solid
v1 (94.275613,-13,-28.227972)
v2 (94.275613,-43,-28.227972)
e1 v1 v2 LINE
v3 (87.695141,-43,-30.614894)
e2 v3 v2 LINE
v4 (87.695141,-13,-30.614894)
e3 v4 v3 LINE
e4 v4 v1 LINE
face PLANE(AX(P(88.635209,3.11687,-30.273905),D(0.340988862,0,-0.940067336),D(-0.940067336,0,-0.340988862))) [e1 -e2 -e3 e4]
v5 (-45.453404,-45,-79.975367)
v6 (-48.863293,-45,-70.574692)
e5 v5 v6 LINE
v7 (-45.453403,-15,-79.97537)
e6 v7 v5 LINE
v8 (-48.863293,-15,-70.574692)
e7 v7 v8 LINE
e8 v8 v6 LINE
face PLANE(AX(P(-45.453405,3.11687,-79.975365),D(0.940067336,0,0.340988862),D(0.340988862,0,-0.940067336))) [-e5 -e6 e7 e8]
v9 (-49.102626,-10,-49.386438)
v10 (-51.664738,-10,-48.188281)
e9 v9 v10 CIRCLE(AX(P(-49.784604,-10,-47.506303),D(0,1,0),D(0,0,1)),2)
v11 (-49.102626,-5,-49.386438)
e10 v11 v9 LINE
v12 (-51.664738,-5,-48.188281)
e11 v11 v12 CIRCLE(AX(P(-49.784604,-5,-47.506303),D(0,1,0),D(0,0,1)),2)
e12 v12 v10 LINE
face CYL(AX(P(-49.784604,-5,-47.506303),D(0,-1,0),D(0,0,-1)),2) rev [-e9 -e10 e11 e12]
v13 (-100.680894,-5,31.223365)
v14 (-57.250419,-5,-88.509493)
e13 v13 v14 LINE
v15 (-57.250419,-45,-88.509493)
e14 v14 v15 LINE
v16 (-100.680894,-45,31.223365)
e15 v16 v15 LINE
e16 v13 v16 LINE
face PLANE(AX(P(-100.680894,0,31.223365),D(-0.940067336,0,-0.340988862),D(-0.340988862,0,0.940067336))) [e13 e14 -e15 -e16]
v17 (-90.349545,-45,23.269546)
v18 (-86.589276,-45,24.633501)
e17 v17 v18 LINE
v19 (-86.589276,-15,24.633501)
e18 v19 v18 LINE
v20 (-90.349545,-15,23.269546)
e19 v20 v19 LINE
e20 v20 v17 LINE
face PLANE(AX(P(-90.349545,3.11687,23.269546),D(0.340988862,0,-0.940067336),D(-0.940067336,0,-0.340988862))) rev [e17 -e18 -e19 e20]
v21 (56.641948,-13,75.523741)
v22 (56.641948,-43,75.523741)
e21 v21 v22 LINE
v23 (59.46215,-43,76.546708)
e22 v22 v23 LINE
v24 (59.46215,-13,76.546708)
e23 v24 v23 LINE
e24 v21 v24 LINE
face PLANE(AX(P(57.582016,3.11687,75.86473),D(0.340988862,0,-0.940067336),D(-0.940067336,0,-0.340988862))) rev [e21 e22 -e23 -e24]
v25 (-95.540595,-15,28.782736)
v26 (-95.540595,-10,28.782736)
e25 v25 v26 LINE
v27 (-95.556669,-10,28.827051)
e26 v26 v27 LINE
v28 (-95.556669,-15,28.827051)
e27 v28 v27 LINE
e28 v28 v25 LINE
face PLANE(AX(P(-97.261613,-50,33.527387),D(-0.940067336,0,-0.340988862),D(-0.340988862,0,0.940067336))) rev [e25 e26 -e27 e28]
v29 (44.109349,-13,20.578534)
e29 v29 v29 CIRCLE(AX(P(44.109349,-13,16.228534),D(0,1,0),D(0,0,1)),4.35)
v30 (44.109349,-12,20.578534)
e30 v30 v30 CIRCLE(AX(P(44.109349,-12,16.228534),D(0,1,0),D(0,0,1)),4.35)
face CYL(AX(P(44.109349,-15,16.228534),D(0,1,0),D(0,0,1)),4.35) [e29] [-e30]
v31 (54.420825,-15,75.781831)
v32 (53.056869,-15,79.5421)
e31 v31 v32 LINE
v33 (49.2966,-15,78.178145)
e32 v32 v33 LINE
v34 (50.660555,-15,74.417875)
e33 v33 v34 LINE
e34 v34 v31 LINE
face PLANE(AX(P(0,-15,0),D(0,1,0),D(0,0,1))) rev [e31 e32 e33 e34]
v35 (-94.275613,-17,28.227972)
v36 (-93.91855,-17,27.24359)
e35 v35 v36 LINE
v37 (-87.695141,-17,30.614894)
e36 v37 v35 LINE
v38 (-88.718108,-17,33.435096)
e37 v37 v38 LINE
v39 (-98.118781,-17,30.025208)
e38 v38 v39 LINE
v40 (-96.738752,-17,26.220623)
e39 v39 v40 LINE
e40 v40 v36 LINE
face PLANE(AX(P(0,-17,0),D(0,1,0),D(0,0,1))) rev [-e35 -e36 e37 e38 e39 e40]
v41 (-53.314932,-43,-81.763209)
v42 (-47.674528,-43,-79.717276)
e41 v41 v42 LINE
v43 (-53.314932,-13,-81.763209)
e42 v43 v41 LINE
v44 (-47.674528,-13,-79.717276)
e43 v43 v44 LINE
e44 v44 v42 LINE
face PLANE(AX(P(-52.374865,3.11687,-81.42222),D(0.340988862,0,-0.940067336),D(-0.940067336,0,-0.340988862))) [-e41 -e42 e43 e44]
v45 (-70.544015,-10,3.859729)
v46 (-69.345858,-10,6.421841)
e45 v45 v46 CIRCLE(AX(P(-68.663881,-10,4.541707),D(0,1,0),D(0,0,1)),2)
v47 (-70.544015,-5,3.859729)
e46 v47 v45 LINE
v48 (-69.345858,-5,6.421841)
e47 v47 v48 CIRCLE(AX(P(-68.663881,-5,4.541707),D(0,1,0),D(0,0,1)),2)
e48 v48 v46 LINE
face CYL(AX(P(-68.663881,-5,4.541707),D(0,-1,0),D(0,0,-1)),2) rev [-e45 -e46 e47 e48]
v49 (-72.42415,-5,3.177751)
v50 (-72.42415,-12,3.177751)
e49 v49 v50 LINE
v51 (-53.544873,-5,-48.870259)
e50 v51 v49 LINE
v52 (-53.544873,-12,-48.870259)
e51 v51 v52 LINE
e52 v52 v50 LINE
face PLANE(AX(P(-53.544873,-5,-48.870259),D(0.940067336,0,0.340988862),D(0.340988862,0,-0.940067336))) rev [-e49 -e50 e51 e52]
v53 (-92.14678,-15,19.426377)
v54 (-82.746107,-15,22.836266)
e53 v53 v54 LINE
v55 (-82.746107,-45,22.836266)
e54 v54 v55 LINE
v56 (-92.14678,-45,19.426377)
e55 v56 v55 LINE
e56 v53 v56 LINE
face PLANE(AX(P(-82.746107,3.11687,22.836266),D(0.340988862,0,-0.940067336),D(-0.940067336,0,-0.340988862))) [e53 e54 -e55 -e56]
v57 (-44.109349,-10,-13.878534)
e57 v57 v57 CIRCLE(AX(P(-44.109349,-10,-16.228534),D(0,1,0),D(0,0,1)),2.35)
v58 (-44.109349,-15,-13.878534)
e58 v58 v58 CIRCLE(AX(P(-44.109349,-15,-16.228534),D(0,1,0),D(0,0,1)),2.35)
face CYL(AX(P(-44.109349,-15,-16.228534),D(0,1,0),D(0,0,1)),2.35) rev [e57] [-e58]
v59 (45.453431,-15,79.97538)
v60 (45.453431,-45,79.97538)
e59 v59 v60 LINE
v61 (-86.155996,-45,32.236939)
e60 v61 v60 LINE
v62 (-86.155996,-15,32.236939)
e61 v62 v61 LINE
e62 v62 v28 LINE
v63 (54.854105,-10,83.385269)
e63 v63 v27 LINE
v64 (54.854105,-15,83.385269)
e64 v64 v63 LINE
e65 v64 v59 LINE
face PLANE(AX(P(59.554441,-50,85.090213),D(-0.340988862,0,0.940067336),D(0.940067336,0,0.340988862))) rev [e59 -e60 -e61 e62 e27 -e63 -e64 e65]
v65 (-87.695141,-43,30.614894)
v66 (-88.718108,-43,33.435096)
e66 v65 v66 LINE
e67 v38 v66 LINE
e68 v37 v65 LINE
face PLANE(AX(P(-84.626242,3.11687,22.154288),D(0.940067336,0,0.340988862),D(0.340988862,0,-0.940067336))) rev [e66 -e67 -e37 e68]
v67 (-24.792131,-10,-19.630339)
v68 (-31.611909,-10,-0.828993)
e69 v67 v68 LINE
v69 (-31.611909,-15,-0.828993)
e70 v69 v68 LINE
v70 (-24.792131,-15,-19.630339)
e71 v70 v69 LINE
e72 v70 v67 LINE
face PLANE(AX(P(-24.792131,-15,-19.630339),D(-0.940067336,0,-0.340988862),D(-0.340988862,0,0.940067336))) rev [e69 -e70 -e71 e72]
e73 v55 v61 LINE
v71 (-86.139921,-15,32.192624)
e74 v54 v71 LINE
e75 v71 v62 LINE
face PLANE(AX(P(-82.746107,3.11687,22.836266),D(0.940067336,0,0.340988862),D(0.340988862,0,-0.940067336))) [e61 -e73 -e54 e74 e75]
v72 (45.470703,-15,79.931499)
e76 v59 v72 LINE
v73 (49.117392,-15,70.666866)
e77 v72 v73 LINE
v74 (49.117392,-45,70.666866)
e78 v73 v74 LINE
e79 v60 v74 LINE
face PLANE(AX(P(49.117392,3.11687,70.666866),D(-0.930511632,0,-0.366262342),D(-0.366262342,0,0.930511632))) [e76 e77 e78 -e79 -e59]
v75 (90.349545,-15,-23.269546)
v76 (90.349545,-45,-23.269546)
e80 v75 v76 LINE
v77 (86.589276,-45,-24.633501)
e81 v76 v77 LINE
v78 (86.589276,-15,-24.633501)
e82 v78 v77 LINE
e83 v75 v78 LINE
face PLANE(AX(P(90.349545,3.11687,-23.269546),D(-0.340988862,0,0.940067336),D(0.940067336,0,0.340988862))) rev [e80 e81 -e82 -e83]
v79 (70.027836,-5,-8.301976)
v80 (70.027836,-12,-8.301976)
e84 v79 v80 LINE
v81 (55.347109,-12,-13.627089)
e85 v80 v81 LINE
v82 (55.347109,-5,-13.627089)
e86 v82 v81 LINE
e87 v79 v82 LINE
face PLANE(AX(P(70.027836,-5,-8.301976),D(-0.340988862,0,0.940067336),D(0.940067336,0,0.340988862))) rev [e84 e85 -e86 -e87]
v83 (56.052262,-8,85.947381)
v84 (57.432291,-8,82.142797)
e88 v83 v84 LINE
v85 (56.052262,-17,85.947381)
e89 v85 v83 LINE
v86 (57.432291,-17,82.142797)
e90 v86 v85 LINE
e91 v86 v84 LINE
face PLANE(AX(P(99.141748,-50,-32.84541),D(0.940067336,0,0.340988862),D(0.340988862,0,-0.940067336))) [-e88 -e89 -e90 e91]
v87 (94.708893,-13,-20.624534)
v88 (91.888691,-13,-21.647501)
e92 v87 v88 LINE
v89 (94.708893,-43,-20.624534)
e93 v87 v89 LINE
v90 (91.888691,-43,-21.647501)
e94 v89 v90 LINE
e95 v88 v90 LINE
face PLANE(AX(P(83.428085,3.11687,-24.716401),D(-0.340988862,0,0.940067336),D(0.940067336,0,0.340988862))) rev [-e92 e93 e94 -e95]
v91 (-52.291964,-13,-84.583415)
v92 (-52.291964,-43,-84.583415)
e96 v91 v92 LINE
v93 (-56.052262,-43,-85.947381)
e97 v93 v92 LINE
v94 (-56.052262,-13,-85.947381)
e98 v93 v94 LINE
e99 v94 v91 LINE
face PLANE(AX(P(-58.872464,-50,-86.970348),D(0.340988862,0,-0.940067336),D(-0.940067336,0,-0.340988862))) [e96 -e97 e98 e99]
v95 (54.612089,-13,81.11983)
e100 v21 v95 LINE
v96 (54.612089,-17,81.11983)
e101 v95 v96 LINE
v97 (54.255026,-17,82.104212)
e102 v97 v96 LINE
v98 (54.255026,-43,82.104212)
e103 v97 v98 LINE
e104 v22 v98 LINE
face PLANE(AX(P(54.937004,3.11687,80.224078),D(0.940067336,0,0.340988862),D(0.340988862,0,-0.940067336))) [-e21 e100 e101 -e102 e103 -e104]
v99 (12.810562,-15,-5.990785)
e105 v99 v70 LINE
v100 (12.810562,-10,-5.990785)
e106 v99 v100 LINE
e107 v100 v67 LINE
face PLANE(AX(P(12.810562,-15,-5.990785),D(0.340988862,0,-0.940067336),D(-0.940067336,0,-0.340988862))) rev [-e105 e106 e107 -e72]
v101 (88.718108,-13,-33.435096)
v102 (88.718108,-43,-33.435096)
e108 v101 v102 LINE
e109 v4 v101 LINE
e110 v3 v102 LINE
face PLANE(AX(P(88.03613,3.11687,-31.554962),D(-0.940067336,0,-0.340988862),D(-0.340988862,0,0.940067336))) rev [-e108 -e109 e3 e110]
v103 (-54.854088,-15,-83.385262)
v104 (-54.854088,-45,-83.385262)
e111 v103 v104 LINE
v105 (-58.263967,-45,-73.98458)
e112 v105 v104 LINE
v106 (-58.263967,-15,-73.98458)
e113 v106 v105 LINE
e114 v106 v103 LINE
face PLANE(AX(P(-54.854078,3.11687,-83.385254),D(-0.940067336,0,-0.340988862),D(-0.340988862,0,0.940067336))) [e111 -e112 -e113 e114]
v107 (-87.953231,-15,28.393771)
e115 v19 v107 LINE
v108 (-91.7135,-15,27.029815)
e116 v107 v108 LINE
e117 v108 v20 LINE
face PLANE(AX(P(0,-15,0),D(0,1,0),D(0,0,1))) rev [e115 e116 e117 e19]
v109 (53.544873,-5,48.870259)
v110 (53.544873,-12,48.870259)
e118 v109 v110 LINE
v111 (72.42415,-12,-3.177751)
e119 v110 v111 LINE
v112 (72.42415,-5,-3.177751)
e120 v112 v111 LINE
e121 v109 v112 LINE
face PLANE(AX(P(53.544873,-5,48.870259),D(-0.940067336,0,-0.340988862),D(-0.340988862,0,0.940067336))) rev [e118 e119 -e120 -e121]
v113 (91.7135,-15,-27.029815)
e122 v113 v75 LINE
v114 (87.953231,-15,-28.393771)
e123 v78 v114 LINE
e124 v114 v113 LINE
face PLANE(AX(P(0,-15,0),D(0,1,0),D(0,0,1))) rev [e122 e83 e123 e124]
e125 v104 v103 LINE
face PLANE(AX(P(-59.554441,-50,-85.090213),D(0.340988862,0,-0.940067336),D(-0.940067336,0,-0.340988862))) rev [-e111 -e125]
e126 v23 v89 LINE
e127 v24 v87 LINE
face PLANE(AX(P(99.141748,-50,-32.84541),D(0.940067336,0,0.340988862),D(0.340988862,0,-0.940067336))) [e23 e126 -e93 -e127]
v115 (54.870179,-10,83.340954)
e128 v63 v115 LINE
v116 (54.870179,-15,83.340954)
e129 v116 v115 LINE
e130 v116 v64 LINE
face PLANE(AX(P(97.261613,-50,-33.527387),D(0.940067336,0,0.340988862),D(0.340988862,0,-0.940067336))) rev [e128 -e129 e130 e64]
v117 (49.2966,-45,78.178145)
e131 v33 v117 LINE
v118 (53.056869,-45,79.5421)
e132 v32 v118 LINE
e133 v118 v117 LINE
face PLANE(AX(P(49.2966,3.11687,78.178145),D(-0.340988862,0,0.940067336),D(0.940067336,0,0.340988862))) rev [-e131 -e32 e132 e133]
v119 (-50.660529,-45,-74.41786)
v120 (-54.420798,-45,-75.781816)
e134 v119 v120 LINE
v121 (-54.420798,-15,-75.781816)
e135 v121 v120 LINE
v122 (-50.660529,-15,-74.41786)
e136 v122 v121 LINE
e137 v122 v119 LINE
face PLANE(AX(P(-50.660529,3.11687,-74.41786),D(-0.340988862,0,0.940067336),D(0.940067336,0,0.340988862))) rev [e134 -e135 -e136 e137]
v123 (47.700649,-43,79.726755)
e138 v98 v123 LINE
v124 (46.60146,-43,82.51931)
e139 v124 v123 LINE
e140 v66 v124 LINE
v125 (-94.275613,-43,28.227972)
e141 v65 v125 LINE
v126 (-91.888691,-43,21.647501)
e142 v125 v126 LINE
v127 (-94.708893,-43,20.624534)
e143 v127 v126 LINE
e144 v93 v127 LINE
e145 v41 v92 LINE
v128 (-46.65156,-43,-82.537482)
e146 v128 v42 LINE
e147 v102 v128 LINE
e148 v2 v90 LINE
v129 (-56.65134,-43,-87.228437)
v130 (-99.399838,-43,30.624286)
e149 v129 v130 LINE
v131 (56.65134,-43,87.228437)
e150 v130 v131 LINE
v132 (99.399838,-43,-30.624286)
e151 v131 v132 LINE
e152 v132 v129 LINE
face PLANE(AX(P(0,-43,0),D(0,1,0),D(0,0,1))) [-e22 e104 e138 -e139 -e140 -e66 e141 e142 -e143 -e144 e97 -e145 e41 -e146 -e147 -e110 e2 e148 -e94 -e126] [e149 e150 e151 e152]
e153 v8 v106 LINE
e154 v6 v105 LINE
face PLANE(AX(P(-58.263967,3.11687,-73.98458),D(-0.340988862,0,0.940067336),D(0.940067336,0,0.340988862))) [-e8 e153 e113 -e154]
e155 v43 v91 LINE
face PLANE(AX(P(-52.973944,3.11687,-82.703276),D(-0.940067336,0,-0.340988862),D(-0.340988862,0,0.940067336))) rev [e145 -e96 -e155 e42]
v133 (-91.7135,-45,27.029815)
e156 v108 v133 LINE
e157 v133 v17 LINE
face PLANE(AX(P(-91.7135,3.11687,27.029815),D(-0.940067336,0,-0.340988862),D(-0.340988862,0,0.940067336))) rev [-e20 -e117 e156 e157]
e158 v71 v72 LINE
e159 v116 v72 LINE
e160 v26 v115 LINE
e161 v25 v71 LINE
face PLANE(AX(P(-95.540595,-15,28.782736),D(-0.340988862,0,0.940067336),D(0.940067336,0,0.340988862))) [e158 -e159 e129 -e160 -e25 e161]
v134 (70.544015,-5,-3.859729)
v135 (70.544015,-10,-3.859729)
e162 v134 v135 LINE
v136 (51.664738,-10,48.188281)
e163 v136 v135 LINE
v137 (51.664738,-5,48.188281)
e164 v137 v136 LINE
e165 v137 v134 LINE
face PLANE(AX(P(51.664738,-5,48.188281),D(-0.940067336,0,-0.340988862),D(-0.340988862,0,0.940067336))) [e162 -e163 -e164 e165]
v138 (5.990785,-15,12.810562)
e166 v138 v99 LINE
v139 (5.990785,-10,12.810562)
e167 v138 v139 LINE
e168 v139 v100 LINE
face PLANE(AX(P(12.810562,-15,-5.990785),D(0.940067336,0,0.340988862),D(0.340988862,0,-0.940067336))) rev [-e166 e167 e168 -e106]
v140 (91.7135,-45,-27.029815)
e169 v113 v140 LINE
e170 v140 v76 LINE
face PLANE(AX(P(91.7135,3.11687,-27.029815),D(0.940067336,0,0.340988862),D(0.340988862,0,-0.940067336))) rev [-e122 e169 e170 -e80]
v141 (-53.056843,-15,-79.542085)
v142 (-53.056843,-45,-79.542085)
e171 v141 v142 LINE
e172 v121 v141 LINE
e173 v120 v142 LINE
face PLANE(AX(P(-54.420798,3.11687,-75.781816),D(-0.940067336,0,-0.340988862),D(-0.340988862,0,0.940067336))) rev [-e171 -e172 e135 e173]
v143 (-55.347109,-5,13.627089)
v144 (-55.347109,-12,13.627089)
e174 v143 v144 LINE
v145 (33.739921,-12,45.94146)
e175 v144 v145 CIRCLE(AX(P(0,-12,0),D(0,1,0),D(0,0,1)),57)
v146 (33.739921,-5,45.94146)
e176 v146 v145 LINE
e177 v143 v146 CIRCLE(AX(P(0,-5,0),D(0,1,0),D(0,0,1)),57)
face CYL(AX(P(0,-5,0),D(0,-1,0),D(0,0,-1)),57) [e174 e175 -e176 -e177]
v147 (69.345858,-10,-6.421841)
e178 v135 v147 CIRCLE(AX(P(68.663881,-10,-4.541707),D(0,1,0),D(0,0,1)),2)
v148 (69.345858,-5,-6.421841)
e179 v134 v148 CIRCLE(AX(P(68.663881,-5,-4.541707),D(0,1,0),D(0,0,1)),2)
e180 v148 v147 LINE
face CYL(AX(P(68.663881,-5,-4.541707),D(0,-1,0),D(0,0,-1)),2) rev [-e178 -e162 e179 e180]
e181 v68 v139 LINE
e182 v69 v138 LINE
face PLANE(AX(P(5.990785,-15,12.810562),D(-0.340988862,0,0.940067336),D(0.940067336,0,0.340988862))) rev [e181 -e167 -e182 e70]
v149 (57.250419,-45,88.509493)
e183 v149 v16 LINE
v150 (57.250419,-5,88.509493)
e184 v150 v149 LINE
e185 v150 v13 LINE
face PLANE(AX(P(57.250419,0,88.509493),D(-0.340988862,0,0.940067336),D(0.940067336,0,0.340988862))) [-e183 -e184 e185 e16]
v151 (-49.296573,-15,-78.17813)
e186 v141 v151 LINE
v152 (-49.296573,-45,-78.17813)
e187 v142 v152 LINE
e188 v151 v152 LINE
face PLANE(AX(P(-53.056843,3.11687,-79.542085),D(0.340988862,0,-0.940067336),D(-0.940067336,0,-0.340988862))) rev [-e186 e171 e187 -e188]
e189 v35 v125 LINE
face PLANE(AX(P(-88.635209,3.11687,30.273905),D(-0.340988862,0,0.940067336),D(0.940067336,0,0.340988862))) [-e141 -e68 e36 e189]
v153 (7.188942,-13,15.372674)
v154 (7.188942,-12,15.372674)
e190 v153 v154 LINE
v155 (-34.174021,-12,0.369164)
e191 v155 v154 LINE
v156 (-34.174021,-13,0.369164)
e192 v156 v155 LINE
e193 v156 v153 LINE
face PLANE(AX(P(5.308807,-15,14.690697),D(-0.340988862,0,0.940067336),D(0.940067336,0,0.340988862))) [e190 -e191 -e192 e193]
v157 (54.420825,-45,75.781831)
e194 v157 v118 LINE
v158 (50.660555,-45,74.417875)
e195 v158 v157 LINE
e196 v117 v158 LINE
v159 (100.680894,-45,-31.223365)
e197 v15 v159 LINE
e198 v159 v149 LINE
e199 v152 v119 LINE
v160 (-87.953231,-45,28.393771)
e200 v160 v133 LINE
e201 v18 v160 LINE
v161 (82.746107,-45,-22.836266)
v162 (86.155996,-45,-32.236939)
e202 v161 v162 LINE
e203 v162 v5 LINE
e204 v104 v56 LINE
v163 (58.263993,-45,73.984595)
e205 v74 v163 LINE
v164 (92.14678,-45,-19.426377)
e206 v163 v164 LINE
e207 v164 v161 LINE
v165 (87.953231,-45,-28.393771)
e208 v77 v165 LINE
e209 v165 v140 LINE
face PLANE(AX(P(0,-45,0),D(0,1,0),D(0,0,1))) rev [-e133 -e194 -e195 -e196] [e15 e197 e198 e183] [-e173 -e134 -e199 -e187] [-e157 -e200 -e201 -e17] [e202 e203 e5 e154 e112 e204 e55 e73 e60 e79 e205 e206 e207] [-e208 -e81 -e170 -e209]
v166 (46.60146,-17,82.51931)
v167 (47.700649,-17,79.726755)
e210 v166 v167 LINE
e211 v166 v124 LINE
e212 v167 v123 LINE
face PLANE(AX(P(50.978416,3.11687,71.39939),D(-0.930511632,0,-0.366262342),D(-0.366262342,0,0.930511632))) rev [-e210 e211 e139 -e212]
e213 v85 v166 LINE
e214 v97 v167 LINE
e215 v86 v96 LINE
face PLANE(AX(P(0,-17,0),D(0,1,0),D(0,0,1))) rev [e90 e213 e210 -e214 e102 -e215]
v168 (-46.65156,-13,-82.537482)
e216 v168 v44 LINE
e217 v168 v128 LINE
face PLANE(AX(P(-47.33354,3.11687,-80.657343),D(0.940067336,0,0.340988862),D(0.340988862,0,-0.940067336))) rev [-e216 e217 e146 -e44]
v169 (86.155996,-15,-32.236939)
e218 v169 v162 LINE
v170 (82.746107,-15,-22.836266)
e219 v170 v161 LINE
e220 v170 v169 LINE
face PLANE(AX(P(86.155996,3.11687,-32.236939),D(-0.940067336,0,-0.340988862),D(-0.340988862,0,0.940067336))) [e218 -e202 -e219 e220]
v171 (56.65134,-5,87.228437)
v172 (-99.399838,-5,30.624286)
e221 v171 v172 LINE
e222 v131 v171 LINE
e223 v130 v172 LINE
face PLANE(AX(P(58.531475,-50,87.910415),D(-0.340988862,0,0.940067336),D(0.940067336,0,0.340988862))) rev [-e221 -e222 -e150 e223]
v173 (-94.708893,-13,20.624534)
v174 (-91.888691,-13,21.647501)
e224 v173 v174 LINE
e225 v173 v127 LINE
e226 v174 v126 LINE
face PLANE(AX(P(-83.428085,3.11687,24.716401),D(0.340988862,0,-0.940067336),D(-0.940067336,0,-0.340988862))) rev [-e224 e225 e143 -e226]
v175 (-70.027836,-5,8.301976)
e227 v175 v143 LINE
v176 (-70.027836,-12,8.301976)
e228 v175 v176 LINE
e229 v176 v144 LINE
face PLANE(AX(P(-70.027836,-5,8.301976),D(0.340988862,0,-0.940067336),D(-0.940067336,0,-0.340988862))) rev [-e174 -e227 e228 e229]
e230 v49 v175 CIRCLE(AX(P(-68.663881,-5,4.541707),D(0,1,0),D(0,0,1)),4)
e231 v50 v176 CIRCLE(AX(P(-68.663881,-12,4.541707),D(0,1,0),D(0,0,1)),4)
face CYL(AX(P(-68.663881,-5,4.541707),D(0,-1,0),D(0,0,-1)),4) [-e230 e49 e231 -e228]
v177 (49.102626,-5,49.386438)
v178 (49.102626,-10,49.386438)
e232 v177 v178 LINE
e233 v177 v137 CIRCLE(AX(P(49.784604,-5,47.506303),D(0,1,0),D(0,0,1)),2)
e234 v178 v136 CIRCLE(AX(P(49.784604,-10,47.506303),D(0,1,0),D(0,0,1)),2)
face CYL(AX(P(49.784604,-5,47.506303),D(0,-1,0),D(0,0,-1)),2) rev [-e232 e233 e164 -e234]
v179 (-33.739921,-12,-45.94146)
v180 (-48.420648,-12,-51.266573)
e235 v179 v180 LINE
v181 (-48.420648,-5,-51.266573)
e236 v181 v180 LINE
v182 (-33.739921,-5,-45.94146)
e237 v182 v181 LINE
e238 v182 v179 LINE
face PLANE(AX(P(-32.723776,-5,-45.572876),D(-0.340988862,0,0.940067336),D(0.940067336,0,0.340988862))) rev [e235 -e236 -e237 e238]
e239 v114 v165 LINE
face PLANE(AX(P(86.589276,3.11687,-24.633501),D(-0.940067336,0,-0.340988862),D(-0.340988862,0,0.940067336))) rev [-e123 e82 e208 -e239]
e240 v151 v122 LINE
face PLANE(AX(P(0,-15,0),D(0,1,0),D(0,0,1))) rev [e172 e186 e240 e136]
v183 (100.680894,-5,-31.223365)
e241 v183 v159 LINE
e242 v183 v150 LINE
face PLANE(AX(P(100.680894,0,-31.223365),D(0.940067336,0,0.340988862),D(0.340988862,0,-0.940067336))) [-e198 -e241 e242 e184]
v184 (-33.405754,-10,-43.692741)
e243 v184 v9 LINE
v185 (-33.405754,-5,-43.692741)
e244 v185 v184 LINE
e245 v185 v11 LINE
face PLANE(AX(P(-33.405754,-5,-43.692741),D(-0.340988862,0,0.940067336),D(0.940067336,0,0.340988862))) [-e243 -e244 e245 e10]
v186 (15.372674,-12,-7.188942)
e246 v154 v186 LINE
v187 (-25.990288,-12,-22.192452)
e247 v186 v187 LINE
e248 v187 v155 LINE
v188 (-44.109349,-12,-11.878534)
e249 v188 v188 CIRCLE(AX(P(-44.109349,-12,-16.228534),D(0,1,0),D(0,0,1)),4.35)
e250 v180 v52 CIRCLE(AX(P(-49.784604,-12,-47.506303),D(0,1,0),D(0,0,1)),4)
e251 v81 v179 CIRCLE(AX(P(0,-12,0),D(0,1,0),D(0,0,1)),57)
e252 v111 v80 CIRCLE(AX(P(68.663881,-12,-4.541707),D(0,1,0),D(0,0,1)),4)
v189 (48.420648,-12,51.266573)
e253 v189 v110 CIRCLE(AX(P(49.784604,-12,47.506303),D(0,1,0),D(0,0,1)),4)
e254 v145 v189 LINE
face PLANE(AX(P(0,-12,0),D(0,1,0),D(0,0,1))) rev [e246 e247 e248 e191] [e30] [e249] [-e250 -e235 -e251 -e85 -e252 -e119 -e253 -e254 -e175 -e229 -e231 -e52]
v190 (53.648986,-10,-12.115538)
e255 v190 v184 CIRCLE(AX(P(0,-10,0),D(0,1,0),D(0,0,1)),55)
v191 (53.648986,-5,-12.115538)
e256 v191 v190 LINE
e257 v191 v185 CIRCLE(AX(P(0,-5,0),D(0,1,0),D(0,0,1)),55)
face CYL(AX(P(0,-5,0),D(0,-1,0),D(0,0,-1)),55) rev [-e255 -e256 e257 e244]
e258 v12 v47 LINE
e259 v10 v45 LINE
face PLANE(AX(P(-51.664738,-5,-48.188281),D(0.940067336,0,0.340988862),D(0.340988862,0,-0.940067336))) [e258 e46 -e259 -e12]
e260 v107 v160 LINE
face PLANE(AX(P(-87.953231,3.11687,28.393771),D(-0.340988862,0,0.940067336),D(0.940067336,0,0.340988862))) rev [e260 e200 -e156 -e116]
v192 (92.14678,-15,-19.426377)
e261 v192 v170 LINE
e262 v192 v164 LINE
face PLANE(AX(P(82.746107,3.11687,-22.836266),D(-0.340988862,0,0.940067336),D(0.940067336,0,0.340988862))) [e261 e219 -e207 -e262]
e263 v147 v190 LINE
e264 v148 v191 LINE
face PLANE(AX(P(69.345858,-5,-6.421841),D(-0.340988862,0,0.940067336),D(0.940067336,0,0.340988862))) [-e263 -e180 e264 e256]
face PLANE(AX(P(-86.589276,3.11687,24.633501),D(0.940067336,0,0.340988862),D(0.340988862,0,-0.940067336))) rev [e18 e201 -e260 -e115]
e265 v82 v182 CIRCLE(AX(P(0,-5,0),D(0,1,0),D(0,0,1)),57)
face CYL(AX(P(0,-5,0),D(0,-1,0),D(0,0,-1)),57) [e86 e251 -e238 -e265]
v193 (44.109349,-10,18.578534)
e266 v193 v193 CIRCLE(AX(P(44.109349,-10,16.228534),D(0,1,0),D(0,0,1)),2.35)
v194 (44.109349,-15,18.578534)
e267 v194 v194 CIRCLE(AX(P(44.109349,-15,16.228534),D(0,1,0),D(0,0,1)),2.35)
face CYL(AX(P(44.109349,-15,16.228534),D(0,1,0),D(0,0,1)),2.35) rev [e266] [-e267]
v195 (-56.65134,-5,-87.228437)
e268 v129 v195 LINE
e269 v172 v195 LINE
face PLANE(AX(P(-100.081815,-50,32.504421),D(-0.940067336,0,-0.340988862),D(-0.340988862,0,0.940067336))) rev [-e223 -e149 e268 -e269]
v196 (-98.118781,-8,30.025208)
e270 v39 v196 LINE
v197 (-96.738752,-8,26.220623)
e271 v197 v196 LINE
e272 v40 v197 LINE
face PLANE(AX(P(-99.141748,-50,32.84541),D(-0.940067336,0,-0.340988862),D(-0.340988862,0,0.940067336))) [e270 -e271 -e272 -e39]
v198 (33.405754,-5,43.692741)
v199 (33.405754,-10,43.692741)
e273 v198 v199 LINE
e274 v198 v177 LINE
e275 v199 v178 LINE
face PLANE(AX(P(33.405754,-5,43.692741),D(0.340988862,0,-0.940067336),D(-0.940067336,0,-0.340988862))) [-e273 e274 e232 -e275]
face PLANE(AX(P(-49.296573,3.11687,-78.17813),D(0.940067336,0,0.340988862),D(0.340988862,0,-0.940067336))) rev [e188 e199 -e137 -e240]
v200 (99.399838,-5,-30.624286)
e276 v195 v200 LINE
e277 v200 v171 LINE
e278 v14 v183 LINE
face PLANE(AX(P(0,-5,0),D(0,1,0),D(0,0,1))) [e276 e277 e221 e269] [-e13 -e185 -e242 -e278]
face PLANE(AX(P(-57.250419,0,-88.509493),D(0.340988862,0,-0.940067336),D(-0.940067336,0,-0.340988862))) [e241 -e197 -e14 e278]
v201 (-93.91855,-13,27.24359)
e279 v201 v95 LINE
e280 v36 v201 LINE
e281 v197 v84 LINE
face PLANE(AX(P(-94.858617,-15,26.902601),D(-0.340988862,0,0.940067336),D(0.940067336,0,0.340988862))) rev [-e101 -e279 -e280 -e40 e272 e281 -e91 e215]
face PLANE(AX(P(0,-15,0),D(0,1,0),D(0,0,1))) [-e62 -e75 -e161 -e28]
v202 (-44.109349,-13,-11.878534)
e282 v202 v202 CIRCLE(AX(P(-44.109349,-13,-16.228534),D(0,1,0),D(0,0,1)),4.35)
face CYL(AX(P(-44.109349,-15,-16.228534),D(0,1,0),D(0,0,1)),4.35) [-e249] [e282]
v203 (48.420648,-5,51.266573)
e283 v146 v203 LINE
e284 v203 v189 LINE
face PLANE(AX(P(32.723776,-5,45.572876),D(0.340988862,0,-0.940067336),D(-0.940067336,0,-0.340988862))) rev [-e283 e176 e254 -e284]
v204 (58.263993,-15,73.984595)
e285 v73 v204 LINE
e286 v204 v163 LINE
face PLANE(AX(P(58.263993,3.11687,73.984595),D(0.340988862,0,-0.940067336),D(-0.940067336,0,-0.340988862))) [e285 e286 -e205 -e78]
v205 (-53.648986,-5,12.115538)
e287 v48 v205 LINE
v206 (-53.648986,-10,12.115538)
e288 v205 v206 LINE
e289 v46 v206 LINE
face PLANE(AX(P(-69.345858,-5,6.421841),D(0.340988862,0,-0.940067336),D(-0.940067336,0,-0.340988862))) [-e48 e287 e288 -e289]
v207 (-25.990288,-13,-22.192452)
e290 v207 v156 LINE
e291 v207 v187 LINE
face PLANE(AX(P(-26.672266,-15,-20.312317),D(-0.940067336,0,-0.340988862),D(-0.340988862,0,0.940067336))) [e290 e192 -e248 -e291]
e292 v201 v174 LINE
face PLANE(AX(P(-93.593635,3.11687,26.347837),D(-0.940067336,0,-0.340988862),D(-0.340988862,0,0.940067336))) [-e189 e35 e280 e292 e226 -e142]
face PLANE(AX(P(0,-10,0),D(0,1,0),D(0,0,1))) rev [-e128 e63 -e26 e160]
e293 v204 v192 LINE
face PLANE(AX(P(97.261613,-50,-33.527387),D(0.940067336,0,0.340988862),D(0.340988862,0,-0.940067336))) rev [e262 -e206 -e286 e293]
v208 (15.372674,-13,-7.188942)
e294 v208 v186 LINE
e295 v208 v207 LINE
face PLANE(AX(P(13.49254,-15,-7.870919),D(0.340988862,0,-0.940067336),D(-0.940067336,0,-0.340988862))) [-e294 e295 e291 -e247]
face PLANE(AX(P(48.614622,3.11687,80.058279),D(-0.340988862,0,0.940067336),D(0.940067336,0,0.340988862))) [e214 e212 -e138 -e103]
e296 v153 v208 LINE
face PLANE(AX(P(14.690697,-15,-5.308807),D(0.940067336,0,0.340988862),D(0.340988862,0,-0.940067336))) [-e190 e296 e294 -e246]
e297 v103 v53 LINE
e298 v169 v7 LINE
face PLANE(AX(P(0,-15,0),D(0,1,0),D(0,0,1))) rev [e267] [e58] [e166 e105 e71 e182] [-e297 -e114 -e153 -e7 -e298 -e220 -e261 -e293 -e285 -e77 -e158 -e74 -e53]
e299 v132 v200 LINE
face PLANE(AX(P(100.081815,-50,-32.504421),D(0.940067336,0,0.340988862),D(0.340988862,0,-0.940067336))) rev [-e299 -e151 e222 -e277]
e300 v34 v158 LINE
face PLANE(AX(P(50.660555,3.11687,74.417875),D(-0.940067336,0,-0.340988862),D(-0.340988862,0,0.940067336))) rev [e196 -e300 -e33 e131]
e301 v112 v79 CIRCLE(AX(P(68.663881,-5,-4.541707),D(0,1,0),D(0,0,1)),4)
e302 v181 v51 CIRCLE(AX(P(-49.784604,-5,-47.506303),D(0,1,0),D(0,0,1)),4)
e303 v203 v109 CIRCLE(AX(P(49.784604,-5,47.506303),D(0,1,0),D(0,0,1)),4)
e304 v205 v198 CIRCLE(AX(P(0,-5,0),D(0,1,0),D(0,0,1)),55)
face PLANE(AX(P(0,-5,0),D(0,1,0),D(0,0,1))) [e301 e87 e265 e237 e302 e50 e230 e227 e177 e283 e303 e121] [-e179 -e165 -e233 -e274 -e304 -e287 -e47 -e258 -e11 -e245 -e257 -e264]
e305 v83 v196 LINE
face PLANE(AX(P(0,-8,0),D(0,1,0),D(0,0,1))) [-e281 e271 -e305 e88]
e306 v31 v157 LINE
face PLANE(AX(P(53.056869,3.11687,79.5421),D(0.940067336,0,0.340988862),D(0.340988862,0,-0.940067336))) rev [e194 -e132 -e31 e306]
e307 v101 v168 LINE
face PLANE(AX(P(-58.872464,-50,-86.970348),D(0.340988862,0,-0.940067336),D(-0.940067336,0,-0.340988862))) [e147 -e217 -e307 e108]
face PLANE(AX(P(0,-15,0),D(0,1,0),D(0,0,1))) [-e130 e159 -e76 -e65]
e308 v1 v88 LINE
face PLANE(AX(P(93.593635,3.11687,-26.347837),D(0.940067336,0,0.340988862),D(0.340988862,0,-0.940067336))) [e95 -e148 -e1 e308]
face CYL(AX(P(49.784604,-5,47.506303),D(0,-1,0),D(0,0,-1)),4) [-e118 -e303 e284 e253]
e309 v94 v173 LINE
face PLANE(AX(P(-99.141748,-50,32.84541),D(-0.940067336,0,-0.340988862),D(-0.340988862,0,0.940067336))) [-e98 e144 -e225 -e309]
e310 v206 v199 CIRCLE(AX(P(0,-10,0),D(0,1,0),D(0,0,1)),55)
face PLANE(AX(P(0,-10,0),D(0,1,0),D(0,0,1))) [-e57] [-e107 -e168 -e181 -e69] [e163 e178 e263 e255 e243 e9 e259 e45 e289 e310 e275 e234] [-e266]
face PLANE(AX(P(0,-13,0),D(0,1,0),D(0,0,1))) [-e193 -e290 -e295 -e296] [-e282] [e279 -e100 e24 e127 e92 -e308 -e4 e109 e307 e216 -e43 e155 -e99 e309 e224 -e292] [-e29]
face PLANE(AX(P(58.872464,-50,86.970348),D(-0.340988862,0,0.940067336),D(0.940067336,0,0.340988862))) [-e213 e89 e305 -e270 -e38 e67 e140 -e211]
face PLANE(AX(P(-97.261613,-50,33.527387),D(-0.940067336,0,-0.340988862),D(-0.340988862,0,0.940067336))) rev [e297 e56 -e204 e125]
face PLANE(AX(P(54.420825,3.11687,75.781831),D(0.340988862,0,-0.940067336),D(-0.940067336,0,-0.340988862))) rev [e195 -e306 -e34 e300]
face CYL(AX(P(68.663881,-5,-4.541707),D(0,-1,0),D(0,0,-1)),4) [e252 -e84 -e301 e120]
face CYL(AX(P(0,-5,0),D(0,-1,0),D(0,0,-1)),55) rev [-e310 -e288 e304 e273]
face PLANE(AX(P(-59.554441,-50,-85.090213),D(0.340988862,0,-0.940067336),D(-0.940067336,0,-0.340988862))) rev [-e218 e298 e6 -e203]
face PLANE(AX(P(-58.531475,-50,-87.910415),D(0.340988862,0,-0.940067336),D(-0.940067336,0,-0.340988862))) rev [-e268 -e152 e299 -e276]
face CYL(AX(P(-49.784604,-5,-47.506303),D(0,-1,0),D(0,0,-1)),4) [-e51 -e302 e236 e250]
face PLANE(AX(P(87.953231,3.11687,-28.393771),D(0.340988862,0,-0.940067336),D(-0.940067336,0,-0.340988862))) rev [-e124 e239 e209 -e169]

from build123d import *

# Parameters (mm, degrees)
EXTRUDE_1_DEPTH      = 50
SHELL_1_T            = -5
EXTRUDE_2_DEPTH      = 5
SKETCH_10_R          = 2.35
EXTRUDE_3_DEPTH      = 5
CUT_EXTRUDE_1_DEPTH  = 5
EXTRUDE_START        = -30
EXTRUDE_4_DEPTH      = 30
SHELL_START          = -13
SHELL_13_DEPTH       = 8
SHELL_START_2        = -43
SHELL_13_2_DEPTH     = 30
SHELL_13_3_OUTLINE_R = 4.35
SHELL_13_3_DEPTH     = 1
SHELL_START_3        = -8
SHELL_13_4_DEPTH     = 3
SHELL_START_4        = -5
SHELL_13_5_DEPTH     = 3
SHELL_13_6_DEPTH     = 26
CUT_EXTRUDE_2_DEPTH  = 144.120865122
CUT_EXTRUDE_3_DEPTH  = 5


# Read off the part's stored shape, not the designer's step: 凸台-拉伸4, 抽壳13
with BuildPart() as part:
    # 草图3 → 凸台-拉伸1 (new body)
    with BuildSketch(Plane(origin=(0, 0, 0), x_dir=(1, 0, 0), z_dir=(0, 1, 0))):
        Polygon((57.849497127, -89.790549593), (-101.961949946, -31.82244298), (-57.849497127, 89.790549593), (101.961949946, 31.82244298), align=None)
    extrude(amount=-EXTRUDE_1_DEPTH)

    # 抽壳1
    shell_1_openings = [part.faces().sort_by_distance(p)[0] for p in [
        (0, 0, 0),
    ]]
    offset(amount=SHELL_1_T, openings=shell_1_openings, kind=Kind.INTERSECTION)

    # 草图4 → 凸台-拉伸2 (add)
    with BuildSketch(Plane(origin=(0, -10, 0), x_dir=(1, 0, 0), z_dir=(0, 1, 0))):
        Polygon((-54.85410476, 83.385268602), (95.556668956, 28.827050613), (54.793783145, -83.551568403), (-95.616990571, -28.993350414), align=None)
        with BuildLine():
            Line((-33.405753886, 43.6927409), (-49.102625926, 49.386437869))
            ThreePointArc((-49.102625926, 49.386437869), (-50.631828553, 49.317990247), (-51.664738322, 48.188280923))
            Line((-51.664738322, 48.188280923), (-70.544015322, -3.859728807))
            ThreePointArc((-70.544015322, -3.859728807), (-70.4755677, -5.388931433), (-69.345858375, -6.421841203))
            Line((-69.345858375, -6.421841203), (-53.648986335, -12.115538173))
            ThreePointArc((-53.648986335, -12.115538173), (-18.754387434, -51.703703465), (33.405753886, -43.6927409))
            Line((33.405753886, -43.6927409), (49.102625926, -49.386437869))
            ThreePointArc((49.102625926, -49.386437869), (50.631828553, -49.317990247), (51.664738322, -48.188280923))
            Line((51.664738322, -48.188280923), (70.544015322, 3.859728807))
            ThreePointArc((70.544015322, 3.859728807), (70.4755677, 5.388931433), (69.345858375, 6.421841203))
            Line((69.345858375, 6.421841203), (53.648986335, 12.115538173))
            ThreePointArc((53.648986335, 12.115538173), (18.754387434, 51.703703465), (-33.405753886, 43.6927409))
        make_face(mode=Mode.SUBTRACT)
    extrude(amount=EXTRUDE_2_DEPTH)

    # 草图10 → 凸台-拉伸3 (add)
    with BuildSketch(Plane(origin=(0, -10, 0), x_dir=(1, 0, 0), z_dir=(0, 1, 0))):
        Polygon((-54.85410476, 83.385268602), (95.556668956, 28.827050613), (54.87017905, -83.340953621), (-95.540594666, -28.782735632), align=None)
        with Locations(Location((44.109349089, -16.22853422, 0), (0, 0, 270))):
            Circle(SKETCH_10_R, mode=Mode.SUBTRACT)
        with Locations(Location((-44.109349089, 16.22853422, 0), (0, 0, 270))):
            Circle(SKETCH_10_R, mode=Mode.SUBTRACT)
        Polygon((5.990784733, -12.810561982), (-31.611908696, 0.828992516), (-24.792131447, 19.63033923), (12.810561982, 5.990784733), align=None, mode=Mode.SUBTRACT)
    extrude(amount=-EXTRUDE_3_DEPTH)

    # 草图11 → 切除-拉伸1 (cut)
    with BuildSketch(Plane(origin=(0, -45, 0), x_dir=(1, 0, 0), z_dir=(0, 1, 0))):
        Polygon((57.849497127, -89.790549593), (101.961949946, 31.82244298), (-57.849497127, 89.790549593), (-101.961949946, -31.82244298), align=None)
    extrude(amount=-CUT_EXTRUDE_1_DEPTH, mode=Mode.SUBTRACT)

    # 凸台-拉伸4 outline → 凸台-拉伸4 (add)
    # profile 1 of 4: a face of its own
    with BuildSketch(Plane.XZ.offset(45).offset(EXTRUDE_START)):
        Polygon((92.146780331, -19.426377256), (82.746106974, -22.83626588), (86.155995598, -32.236939238), (95.556668956, -28.827050613), align=None)
        Polygon((91.713500361, -27.029815193), (87.953231018, -28.393770643), (86.589275569, -24.6335013), (90.349544911, -23.26954585), align=None, mode=Mode.SUBTRACT)
    # profile 2 of 4: a face of its own
    with BuildSketch(Plane.XZ.offset(45).offset(EXTRUDE_START)):
        Polygon((-54.85410476, -83.385268602), (-45.453403196, -79.975369746), (-48.863293462, -70.574691864), (-58.263966819, -73.984580488), align=None)
        Polygon((-49.296573432, -78.178129801), (-53.056842775, -79.542085251), (-54.420798224, -75.781815908), (-50.660528881, -74.417860458), align=None, mode=Mode.SUBTRACT)
    # profile 3 of 4: a face of its own
    with BuildSketch(Plane.XZ.offset(45).offset(EXTRUDE_START)):
        Polygon((49.11739228, 70.666865773), (58.263993385, 73.984595245), (54.87017905, 83.340953621), (54.85410476, 83.385268602), (45.453431403, 79.975379978), align=None)
        Polygon((50.660555447, 74.417875215), (49.296599998, 78.178144558), (53.05686934, 79.542100008), (54.42082479, 75.781830665), align=None, mode=Mode.SUBTRACT)
    # profile 4 of 4: a face of its own
    with BuildSketch(Plane.XZ.offset(45).offset(EXTRUDE_START)):
        Polygon((-95.540594666, 28.782735632), (-92.146780332, 19.426377256), (-82.746106974, 22.83626588), (-86.155995598, 32.236939238), (-95.556668956, 28.827050613), align=None)
        Polygon((-91.713500361, 27.029815193), (-87.953231018, 28.393770643), (-86.589275569, 24.6335013), (-90.349544911, 23.26954585), align=None, mode=Mode.SUBTRACT)
    extrude(amount=EXTRUDE_4_DEPTH)

    # 抽壳13 outline → 抽壳13 (cut)
    with BuildSketch(Plane(origin=(0, 0, 0), x_dir=(1, 0, 0), z_dir=(0, 1, 0)).offset(SHELL_START)):
        Polygon((-99.39983755, -30.624286033), (56.65134018, -87.228437197), (99.39983755, 30.624286033), (-56.65134018, 87.228437197), align=None)
        Polygon((57.432291447, -82.142796675), (56.052261707, -85.947380999), (-98.118781352, -30.02520756), (-96.738751612, -26.220623236), align=None, mode=Mode.SUBTRACT)
        with BuildLine():
            Line((-72.424149993, -3.177751082), (-53.544872994, 48.870258648))
            ThreePointArc((-53.544872994, 48.870258648), (-51.479053454, 51.129677297), (-48.420648201, 51.266572541))
            Line((-48.420648201, 51.266572541), (-33.739920947, 45.941459864))
            ThreePointArc((-33.739920947, 45.941459864), (19.436365158, 53.583838136), (55.347108846, 13.627088551))
            Line((55.347108846, 13.627088551), (70.0278361, 8.301975874))
            ThreePointArc((70.0278361, 8.301975874), (72.28725475, 6.236156335), (72.424149993, 3.177751082))
            Line((72.424149993, 3.177751082), (53.544872994, -48.870258648))
            ThreePointArc((53.544872994, -48.870258648), (51.479053454, -51.129677297), (48.420648201, -51.266572541))
            Line((48.420648201, -51.266572541), (33.739920947, -45.941459864))
            ThreePointArc((33.739920947, -45.941459864), (-19.436365158, -53.583838136), (-55.347108846, -13.627088551))
            Line((-55.347108846, -13.627088551), (-70.0278361, -8.301975874))
            ThreePointArc((-70.0278361, -8.301975874), (-72.28725475, -6.236156335), (-72.424149993, -3.177751082))
        make_face(mode=Mode.SUBTRACT)
    extrude(amount=SHELL_13_DEPTH, mode=Mode.SUBTRACT)

    # Shell 13 2 outline → Shell 13 2 (cut)
    with BuildSketch(Plane(origin=(0, 0, 0), x_dir=(1, 0, 0), z_dir=(0, 1, 0)).offset(SHELL_START_2)):
        Polygon((-99.39983755, -30.624286033), (56.65134018, -87.228437197), (99.39983755, 30.624286033), (-56.65134018, 87.228437197), align=None)
        Polygon((56.641948324, -75.523741054), (54.612089439, -81.119830088), (57.432291447, -82.142796675), (56.052261707, -85.947380999), (-98.118781352, -30.02520756), (-96.738751612, -26.220623236), (-93.918549605, -27.243589823), (-91.88869072, -21.64750079), (-94.708892728, -20.624534203), (-56.052261707, 85.947380999), (-52.291964157, 84.583415318), (-53.314932385, 81.763208785), (-47.674528371, 79.71727561), (-46.651560142, 82.537482143), (88.718107995, 33.435096184), (87.695141407, 30.614894177), (94.275612757, 28.22797214), (91.88869072, 21.64750079), (94.708892728, 20.624534203), (59.462150331, -76.546707641), align=None, mode=Mode.SUBTRACT)
    extrude(amount=SHELL_13_2_DEPTH, mode=Mode.SUBTRACT)

    # Shell 13 3 outline → Shell 13 3 (cut)
    with BuildSketch(Plane(origin=(0, 0, 0), x_dir=(1, 0, 0), z_dir=(0, 1, 0)).offset(SHELL_START)):
        with BuildLine():
            ThreePointArc((-48.420648201, 51.266572541), (-51.479053454, 51.129677297), (-53.544872994, 48.870258648))
            Line((-53.544872994, 48.870258648), (-72.424149993, -3.177751082))
            ThreePointArc((-72.424149993, -3.177751082), (-72.28725475, -6.236156335), (-70.0278361, -8.301975874))
            Line((-70.0278361, -8.301975874), (-55.347108846, -13.627088551))
            ThreePointArc((-55.347108846, -13.627088551), (-19.436365158, -53.583838136), (33.739920947, -45.941459864))
            Line((33.739920947, -45.941459864), (48.420648201, -51.266572541))
            ThreePointArc((48.420648201, -51.266572541), (51.479053454, -51.129677297), (53.544872994, -48.870258648))
            Line((53.544872994, -48.870258648), (72.424149993, 3.177751082))
            ThreePointArc((72.424149993, 3.177751082), (72.28725475, 6.236156335), (70.0278361, 8.301975874))
            Line((70.0278361, 8.301975874), (55.347108846, 13.627088551))
            ThreePointArc((55.347108846, 13.627088551), (19.436365158, 53.583838136), (-33.739920947, 45.941459864))
            Line((-33.739920947, 45.941459864), (-48.420648201, 51.266572541))
        make_face()
        with Locations((44.109349089, -16.22853422)):
            Circle(SHELL_13_3_OUTLINE_R, mode=Mode.SUBTRACT)
        with Locations((-44.109349089, 16.22853422)):
            Circle(SHELL_13_3_OUTLINE_R, mode=Mode.SUBTRACT)
        Polygon((15.372674378, 7.18894168), (7.18894168, -15.372674378), (-34.174021092, -0.369164431), (-25.990288394, 22.192451627), align=None, mode=Mode.SUBTRACT)
    extrude(amount=SHELL_13_3_DEPTH, mode=Mode.SUBTRACT)

    # Shell 13 4 outline → Shell 13 4 (cut)
    with BuildSketch(Plane(origin=(0, 0, 0), x_dir=(1, 0, 0), z_dir=(0, 1, 0)).offset(SHELL_START_3)):
        Polygon((56.052261707, -85.947380999), (57.432291447, -82.142796675), (-96.738751612, -26.220623236), (-98.118781352, -30.02520756), align=None)
    extrude(amount=SHELL_13_4_DEPTH, mode=Mode.SUBTRACT)

    # Shell 13 5 outline → Shell 13 5 (cut)
    with BuildSketch(Plane(origin=(0, 0, 0), x_dir=(1, 0, 0), z_dir=(0, 1, 0)).offset(SHELL_START_4)):
        Polygon((-99.39983755, -30.624286033), (56.65134018, -87.228437197), (99.39983755, 30.624286033), (-56.65134018, 87.228437197), align=None)
        Polygon((59.462150331, -76.546707641), (56.052261707, -85.947380999), (-98.118781352, -30.02520756), (-94.708892728, -20.624534203), (-56.052261707, 85.947380999), (-46.651560142, 82.537482143), (88.718107995, 33.435096184), (98.118781352, 30.02520756), (94.708892728, 20.624534203), align=None, mode=Mode.SUBTRACT)
    extrude(amount=SHELL_13_5_DEPTH, mode=Mode.SUBTRACT)

    # Shell 13 6 outline → Shell 13 6 (cut)
    with BuildSketch(Plane(origin=(0, 0, 0), x_dir=(1, 0, 0), z_dir=(0, 1, 0)).offset(SHELL_START_2)):
        Polygon((54.612089439, -81.119830088), (54.255026287, -82.104212404), (47.700648719, -79.726755316), (46.601460456, -82.519309577), (56.052261707, -85.947380999), (57.432291447, -82.142796675), align=None)
        Polygon((-94.275612757, -28.22797214), (-93.918549605, -27.243589823), (-96.738751612, -26.220623236), (-98.118781352, -30.02520756), (-88.718107995, -33.435096184), (-87.695141407, -30.614894177), align=None)
    extrude(amount=SHELL_13_6_DEPTH, mode=Mode.SUBTRACT)

    # 草图16 → 切除-拉伸2 (cut, through all)
    with BuildSketch(Plane.XZ.offset(45)):
        Polygon((-101.961949946, 31.82244298), (57.849497127, 89.790549593), (101.961949946, -31.82244298), (-57.849497127, -89.790549593), align=None)
        Polygon((-100.680893748, 31.223364506), (-57.250418654, -88.509493395), (100.680893748, -31.223364506), (57.250418654, 88.509493395), align=None, mode=Mode.SUBTRACT)
    extrude(amount=-CUT_EXTRUDE_2_DEPTH, mode=Mode.SUBTRACT)

    # 草图17 → 切除-拉伸3 (cut)
    with BuildSketch(Plane(origin=(0, 0, 0), x_dir=(1, 0, 0), z_dir=(0, 1, 0))):
        Polygon((57.250418654, -88.509493395), (-100.680893748, -31.223364506), (-57.250418654, 88.509493395), (100.680893748, 31.223364506), align=None)
    extrude(amount=-CUT_EXTRUDE_3_DEPTH, mode=Mode.SUBTRACT)


solid = part.part
